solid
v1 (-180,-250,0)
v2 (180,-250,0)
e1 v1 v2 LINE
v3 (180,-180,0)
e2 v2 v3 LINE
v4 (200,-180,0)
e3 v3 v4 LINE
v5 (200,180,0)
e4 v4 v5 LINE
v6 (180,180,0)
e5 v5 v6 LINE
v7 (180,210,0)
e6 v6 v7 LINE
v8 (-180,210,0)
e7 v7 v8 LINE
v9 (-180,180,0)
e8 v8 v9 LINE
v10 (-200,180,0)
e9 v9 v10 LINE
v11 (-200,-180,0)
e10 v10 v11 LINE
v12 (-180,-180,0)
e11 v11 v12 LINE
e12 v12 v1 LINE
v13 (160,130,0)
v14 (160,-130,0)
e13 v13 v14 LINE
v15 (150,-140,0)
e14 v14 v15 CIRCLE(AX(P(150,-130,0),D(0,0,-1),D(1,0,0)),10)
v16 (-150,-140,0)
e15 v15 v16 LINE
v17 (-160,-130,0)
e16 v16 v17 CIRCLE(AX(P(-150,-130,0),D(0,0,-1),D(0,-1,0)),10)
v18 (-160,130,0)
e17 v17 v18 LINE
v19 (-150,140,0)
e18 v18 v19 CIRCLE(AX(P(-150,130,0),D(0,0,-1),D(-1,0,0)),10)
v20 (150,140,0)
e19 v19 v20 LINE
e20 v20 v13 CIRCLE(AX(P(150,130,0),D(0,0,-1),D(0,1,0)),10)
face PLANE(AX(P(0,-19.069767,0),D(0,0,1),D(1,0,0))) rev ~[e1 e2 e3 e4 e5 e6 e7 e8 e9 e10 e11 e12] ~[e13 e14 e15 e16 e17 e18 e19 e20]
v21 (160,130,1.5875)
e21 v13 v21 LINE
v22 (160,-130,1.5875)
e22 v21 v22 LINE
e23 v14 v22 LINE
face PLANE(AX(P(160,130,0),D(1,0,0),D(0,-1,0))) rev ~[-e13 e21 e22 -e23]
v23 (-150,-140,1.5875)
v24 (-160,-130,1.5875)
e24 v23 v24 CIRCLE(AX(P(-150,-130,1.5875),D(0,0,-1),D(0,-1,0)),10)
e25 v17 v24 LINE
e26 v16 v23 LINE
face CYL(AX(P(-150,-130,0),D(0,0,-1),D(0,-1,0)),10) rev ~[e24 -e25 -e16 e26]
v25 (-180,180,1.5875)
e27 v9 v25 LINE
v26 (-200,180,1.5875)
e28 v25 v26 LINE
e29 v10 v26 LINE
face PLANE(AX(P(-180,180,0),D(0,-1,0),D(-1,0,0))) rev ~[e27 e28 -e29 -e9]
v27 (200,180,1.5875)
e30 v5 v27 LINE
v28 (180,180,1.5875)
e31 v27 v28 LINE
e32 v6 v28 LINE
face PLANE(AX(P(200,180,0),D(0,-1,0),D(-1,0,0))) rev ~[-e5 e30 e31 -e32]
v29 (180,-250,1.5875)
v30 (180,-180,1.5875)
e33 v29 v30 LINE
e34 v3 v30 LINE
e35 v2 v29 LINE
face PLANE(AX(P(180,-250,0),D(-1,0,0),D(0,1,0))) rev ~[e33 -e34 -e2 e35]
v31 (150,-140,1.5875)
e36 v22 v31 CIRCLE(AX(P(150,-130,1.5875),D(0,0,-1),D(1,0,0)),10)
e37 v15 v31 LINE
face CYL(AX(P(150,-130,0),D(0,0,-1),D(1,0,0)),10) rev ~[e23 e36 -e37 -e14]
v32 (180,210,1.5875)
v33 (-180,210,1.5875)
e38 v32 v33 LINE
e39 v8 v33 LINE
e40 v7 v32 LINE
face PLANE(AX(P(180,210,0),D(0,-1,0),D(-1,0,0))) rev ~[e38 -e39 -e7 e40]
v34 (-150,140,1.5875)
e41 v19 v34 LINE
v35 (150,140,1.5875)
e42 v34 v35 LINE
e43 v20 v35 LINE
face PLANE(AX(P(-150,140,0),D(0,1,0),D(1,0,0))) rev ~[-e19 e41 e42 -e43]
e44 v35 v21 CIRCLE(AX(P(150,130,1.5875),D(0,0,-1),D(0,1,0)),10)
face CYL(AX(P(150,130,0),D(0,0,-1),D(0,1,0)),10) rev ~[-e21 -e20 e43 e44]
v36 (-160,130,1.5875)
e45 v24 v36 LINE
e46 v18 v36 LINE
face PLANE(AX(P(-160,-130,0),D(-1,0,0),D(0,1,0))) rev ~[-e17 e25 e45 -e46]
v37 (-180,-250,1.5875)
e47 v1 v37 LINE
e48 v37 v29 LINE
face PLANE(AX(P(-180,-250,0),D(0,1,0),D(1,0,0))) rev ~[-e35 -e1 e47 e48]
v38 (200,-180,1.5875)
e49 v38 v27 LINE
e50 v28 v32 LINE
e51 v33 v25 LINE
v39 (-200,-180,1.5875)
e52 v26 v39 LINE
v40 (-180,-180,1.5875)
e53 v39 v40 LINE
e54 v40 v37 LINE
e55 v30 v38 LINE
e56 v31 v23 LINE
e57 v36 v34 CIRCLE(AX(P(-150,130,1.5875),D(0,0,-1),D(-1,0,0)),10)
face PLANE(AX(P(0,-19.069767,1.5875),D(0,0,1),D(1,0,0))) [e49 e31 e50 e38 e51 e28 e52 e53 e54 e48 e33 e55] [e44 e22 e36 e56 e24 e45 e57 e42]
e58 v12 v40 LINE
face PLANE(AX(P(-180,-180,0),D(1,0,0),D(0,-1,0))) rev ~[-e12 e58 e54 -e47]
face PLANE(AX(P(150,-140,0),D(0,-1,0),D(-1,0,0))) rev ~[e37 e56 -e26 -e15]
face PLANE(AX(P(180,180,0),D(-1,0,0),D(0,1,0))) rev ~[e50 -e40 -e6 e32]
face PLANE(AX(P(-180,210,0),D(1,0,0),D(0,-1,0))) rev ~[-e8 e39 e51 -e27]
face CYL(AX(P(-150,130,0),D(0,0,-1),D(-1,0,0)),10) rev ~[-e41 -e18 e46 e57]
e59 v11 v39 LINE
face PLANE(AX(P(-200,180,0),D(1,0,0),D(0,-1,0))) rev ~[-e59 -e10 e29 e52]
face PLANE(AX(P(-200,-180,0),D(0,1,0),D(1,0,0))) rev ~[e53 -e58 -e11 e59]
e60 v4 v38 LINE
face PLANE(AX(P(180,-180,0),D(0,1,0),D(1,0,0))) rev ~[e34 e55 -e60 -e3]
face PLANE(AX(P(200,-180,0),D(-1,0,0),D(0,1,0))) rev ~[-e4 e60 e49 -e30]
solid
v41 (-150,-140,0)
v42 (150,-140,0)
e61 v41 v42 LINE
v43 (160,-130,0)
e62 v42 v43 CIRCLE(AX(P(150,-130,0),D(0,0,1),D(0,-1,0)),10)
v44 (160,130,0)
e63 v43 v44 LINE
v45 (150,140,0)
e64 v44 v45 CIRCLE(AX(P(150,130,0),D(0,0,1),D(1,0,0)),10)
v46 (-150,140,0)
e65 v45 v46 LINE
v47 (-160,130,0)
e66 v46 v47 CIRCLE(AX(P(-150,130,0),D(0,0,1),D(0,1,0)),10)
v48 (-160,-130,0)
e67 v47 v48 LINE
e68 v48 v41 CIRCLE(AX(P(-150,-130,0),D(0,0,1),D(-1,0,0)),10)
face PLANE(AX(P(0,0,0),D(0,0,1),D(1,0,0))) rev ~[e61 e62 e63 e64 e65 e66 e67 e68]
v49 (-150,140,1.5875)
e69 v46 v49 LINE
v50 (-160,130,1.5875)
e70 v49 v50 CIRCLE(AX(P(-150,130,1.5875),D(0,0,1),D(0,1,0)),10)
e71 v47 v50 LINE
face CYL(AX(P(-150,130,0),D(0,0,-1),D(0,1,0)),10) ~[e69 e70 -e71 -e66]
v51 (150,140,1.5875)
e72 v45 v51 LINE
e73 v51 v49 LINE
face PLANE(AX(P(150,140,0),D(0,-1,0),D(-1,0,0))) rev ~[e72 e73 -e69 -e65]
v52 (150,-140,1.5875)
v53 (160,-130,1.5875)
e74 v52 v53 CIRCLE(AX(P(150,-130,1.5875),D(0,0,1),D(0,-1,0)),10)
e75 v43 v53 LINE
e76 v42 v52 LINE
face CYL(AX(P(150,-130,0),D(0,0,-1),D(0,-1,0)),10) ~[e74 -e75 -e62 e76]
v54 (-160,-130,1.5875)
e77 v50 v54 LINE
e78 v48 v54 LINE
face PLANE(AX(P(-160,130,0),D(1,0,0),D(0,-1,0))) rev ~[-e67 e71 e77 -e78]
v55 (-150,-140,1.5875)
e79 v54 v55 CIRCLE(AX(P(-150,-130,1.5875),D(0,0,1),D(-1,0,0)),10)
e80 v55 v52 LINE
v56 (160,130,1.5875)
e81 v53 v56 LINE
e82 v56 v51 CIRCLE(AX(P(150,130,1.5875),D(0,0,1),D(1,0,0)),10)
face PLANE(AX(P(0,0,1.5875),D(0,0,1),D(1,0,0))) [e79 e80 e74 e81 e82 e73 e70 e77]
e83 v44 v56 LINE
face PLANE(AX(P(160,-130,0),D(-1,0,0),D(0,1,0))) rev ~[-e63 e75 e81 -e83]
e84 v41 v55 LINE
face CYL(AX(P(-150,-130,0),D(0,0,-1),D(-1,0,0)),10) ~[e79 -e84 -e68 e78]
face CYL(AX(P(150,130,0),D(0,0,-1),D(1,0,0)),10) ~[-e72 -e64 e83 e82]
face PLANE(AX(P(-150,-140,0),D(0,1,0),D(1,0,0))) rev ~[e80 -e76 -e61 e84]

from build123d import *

# Parameters (mm, degrees)
F1_DEPTH = 1.5875
F2_DEPTH = 1.5875


# Not quite as in the source:
# - a length typed as a fraction of an inch, garbled in the dataset ("3 / 203.2 mm" for 3/8 in), is restored


with BuildPart() as f1:
    # F0 (on Top) → F1 (new body)
    with BuildSketch(Plane.XY):
        Polygon((-200, 180), (-200, -180), (-180, -180), (-180, -250), (0, -250), (180, -250), (180, -180), (200, -180), (200, 180), (180, 180), (180, 210), (0, 210), (-180, 210), (-180, 180), align=None)
        with BuildLine():
            Line((150, -140), (0, -140))
            Line((0, -140), (-150, -140))
            ThreePointArc((-150, -140), (-157.0710678119, -137.0710678119), (-160, -130))
            Line((-160, -130), (-160, 130))
            ThreePointArc((-160, 130), (-157.0710678119, 137.0710678119), (-150, 140))
            Line((-150, 140), (0, 140))
            Line((0, 140), (150, 140))
            ThreePointArc((150, 140), (157.0710678119, 137.0710678119), (160, 130))
            Line((160, 130), (160, -130))
            ThreePointArc((160, -130), (157.0710678119, -137.0710678119), (150, -140))
        make_face(mode=Mode.SUBTRACT)
    extrude(amount=F1_DEPTH)


with BuildPart() as f2:
    # F0 (on Top) → F2 (new body)
    with BuildSketch(Plane.XY):
        with BuildLine():
            Line((-150, -140), (0, -140))
            Line((0, -140), (150, -140))
            ThreePointArc((150, -140), (157.0710678119, -137.0710678119), (160, -130))
            Line((160, -130), (160, 130))
            ThreePointArc((160, 130), (157.0710678119, 137.0710678119), (150, 140))
            Line((150, 140), (0, 140))
            Line((0, 140), (-150, 140))
            ThreePointArc((-150, 140), (-157.0710678119, 137.0710678119), (-160, 130))
            Line((-160, 130), (-160, -130))
            ThreePointArc((-160, -130), (-157.0710678119, -137.0710678119), (-150, -140))
        make_face()
    extrude(amount=F2_DEPTH)


solid = Compound([f1.part, f2.part])
